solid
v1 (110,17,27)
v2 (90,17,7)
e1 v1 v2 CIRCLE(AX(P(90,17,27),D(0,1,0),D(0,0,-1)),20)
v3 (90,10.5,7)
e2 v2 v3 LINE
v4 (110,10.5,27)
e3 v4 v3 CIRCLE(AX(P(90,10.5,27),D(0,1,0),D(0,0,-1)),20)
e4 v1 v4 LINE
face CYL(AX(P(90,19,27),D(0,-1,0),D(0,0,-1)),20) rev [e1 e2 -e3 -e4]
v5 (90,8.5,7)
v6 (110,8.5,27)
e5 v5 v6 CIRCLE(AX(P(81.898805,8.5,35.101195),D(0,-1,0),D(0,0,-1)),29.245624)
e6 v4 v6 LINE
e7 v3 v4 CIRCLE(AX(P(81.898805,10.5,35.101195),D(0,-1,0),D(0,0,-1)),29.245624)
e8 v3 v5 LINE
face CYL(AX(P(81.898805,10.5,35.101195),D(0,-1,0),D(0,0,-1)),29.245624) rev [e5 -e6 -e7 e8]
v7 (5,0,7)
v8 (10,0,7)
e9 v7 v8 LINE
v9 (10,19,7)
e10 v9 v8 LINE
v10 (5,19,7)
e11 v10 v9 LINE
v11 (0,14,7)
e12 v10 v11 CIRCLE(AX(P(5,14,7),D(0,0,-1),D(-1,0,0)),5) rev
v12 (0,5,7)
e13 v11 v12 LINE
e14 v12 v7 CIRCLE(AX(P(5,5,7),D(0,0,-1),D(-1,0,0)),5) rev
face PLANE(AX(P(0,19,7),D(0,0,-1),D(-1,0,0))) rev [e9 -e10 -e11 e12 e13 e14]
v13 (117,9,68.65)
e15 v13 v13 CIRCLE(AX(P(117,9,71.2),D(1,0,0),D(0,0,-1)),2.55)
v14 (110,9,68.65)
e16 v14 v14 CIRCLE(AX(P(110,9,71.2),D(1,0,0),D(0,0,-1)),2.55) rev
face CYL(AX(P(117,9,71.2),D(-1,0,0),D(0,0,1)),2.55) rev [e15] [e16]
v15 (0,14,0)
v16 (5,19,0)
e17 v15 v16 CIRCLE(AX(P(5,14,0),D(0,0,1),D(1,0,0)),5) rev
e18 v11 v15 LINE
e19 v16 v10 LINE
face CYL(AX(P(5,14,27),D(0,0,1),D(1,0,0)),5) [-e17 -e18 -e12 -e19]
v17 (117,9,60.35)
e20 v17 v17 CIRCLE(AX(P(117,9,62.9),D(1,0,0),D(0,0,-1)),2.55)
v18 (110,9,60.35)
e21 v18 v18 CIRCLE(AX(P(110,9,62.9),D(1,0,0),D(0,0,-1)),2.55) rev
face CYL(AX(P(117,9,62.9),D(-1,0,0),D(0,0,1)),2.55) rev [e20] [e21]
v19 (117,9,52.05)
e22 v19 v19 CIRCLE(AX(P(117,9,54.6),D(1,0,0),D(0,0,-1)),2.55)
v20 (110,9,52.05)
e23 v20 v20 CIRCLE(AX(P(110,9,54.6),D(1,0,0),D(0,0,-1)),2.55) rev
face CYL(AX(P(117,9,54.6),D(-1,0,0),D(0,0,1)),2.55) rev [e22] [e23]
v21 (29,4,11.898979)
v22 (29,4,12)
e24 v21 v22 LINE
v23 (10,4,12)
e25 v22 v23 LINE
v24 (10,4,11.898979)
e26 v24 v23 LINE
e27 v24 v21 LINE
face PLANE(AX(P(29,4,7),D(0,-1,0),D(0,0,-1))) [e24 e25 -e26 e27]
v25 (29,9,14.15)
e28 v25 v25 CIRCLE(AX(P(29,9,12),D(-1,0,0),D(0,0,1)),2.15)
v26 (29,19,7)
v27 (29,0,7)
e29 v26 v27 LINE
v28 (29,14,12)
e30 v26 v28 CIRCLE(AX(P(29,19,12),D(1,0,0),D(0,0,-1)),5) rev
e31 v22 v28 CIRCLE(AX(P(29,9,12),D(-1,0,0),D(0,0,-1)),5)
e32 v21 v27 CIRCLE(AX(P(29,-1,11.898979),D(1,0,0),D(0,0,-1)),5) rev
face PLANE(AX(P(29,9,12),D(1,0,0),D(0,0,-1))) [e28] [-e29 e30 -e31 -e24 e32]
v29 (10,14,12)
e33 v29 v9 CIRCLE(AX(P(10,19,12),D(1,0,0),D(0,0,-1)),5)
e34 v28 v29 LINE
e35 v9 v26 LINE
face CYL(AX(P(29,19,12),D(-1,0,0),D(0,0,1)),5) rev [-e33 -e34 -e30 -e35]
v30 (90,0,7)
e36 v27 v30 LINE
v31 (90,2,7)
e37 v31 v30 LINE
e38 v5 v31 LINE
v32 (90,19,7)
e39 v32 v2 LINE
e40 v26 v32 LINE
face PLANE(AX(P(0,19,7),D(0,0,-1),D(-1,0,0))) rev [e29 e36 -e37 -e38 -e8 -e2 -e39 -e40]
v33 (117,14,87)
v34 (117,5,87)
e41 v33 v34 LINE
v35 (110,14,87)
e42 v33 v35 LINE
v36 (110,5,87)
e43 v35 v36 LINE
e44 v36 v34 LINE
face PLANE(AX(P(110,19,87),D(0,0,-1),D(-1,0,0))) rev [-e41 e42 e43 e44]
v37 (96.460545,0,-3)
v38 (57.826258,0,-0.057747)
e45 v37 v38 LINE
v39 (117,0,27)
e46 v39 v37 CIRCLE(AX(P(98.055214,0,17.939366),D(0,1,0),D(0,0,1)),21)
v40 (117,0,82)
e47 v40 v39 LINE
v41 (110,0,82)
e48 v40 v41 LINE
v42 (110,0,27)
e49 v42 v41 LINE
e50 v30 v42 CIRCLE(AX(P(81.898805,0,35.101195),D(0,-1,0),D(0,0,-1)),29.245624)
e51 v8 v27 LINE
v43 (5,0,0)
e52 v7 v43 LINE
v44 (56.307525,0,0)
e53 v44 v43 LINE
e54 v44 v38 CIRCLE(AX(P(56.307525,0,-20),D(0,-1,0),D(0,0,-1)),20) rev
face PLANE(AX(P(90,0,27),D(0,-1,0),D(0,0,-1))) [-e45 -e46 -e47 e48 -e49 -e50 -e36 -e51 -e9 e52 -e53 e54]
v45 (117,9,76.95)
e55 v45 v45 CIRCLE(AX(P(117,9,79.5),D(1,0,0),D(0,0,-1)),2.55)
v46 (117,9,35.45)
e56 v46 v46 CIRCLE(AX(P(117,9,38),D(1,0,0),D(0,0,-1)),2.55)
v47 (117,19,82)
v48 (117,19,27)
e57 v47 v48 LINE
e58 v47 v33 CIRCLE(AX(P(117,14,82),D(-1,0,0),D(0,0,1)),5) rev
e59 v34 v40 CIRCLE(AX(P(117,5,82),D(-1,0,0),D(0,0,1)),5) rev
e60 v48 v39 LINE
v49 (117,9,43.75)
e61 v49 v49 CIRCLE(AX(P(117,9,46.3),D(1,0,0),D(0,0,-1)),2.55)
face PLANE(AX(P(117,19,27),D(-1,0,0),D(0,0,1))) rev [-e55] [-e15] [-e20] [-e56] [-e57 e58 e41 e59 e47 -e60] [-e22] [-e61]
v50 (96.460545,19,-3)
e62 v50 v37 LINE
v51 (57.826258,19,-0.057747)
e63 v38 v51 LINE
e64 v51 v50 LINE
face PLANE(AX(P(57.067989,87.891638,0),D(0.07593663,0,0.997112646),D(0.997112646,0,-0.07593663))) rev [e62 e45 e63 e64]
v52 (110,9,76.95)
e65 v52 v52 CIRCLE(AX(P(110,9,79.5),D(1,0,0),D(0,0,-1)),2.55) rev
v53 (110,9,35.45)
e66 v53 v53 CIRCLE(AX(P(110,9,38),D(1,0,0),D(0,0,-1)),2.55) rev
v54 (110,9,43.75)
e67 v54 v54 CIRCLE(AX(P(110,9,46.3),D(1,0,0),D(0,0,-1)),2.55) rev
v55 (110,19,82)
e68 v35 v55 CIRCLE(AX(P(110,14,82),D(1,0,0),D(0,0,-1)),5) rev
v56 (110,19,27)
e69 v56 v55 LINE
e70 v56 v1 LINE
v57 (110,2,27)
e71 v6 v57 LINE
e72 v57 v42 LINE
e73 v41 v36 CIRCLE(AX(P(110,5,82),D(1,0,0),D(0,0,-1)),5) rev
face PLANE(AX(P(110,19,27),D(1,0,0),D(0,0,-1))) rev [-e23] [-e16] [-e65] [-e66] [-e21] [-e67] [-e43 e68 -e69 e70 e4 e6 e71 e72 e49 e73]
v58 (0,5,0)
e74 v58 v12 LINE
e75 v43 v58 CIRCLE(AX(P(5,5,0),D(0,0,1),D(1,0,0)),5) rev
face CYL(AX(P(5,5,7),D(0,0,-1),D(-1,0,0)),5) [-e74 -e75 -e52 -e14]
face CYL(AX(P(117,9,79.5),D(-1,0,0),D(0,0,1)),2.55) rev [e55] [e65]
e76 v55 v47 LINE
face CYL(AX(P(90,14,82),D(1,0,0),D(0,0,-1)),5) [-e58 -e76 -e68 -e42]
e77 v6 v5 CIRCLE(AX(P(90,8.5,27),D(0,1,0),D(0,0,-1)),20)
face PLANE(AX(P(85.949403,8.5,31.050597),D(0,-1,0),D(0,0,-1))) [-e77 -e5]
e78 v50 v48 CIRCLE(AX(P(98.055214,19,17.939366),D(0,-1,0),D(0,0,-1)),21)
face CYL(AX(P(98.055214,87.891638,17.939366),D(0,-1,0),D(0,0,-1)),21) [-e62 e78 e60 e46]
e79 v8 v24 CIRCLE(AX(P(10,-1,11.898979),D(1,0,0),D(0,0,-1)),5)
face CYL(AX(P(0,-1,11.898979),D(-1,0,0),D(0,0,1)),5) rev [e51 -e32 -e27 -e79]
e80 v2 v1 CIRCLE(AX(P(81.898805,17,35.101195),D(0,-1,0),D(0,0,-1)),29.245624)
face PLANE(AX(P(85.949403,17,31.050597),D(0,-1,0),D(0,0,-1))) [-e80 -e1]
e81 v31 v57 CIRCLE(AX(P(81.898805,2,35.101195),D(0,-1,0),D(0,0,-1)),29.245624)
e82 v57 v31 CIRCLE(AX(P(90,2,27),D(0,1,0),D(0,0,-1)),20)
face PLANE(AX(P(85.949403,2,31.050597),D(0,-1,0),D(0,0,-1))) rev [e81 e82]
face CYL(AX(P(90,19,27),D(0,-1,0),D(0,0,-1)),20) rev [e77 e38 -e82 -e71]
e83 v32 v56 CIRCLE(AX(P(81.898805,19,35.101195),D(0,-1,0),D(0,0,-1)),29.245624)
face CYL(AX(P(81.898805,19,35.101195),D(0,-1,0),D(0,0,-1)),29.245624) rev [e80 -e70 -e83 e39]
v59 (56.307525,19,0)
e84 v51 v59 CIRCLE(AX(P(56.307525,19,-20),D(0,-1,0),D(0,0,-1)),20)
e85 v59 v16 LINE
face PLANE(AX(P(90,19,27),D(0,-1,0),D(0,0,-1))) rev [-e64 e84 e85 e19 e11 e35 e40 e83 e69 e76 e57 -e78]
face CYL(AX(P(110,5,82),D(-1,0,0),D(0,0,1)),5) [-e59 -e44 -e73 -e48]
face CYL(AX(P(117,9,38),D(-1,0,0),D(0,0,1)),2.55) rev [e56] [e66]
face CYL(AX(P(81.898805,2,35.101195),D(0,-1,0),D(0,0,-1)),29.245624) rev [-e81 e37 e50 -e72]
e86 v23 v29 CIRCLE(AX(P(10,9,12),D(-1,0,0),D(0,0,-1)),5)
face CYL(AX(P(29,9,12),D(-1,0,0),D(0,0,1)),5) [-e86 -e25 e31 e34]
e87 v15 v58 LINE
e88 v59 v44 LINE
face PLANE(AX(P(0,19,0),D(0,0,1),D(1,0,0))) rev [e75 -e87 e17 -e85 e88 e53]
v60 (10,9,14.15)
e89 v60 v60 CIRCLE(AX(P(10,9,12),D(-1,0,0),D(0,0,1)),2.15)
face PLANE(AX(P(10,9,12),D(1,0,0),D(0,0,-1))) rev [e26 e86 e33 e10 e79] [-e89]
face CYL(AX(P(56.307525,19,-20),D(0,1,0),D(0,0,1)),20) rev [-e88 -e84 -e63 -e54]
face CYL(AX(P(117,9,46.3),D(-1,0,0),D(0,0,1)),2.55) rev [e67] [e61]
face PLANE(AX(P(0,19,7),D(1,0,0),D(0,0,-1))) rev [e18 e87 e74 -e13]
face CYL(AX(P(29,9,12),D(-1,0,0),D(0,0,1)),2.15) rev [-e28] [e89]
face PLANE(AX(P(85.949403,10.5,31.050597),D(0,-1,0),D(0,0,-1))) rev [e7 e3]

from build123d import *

# Parameters (mm, degrees)
BOSS_EXTRUDE1_DEPTH = 19
SKETCH4_R           = 2.55
CUT_EXTRUDE1_DEPTH  = 148.034009671
LPATTERN1_COUNT     = 6
LPATTERN1_PITCH     = 8.3
FILLET2_R           = 5
BOSS_EXTRUDE4_DEPTH = 19
BOSS_EXTRUDE5_DEPTH = 2
LPATTERN3_COUNT     = 3
LPATTERN3_PITCH     = 8.5
FILLET4_R           = 20
SKETCH9_R           = 2.15
BOSS_EXTRUDE6_DEPTH = 19
FILLET5_R           = 5


with BuildPart() as part:
    # Sketch1 → Boss-Extrude1 (new body)
    with BuildSketch(Plane(origin=(0, 0, 0), x_dir=(1, 0, 0), z_dir=(0, 1, 0))):
        with BuildLine():
            Line((0, 0), (90, 0))
            ThreePointArc((90, 0), (109.091883092, -7.908116908), (117, -27))
            Line((117, -27), (117, -87))
            Line((117, -87), (110, -87))
            Line((110, -87), (110, -27))
            ThreePointArc((110, -27), (104.142135624, -12.857864376), (90, -7))
            Line((90, -7), (0, -7))
            Line((0, -7), (0, 0))
        make_face()
    extrude(amount=BOSS_EXTRUDE1_DEPTH)

    # Sketch4 → Cut-Extrude1 (cut, through all)
    with BuildSketch(Plane(origin=(0, 0, 0), x_dir=(0, 0, -1), z_dir=(1, 0, 0))):
        with Locations((-79.5, 9)):
            Circle(SKETCH4_R)
    cut_extrude1 = extrude(amount=CUT_EXTRUDE1_DEPTH, mode=Mode.SUBTRACT)

    # LPattern1: Cut-Extrude1 ×6
    with Locations(*[(0, 0, -i * LPATTERN1_PITCH) for i in range(1, LPATTERN1_COUNT)]):
        add(cut_extrude1, mode=Mode.SUBTRACT)

    # Fillet2
    fillet2_edges = [part.edges().sort_by_distance(p)[0] for p in [
        (0, 0, 3.5),
        (113.5, 19, 87),
        (0, 19, 3.5),
        (113.5, 0, 87),
    ]]
    fillet(fillet2_edges, radius=FILLET2_R)

    # Sketch6 → Boss-Extrude4 (add)
    with BuildSketch(Plane(origin=(0, 0, 0), x_dir=(1, 0, 0), z_dir=(0, 1, 0))):
        with BuildLine():
            Line((57.067989457, 0), (96.460545107, 3))
            ThreePointArc((96.460545107, 3), (115.383129249, -6.075834674), (117, -27))
            ThreePointArc((117, -27), (109.091883092, -7.908116908), (90, 0))
            Line((90, 0), (57.067989457, 0))
        make_face()
    extrude(amount=BOSS_EXTRUDE4_DEPTH)

    # Sketch8 → Boss-Extrude5 (add)
    with BuildSketch(Plane(origin=(0, 0, 0), x_dir=(1, 0, 0), z_dir=(0, 1, 0))):
        with BuildLine():
            ThreePointArc((90, -7), (102.578584062, -14.421415938), (110, -27))
            ThreePointArc((110, -27), (104.142135624, -12.857864376), (90, -7))
        make_face()
    boss_extrude5 = extrude(amount=BOSS_EXTRUDE5_DEPTH)

    # LPattern3: Boss-Extrude5 ×3
    with Locations(*[(0, i * LPATTERN3_PITCH, 0) for i in range(1, LPATTERN3_COUNT)]):
        add(boss_extrude5)

    # Fillet4
    # the kernel refuses this fillet: 20 mm, written as the material it adds along each edge
    with BuildSketch(Plane(origin=(57.067989457, 0, 0), x_dir=(-1, 0, 0), z_dir=(0, 1, 0))) as fillet4_piece_1:
        with BuildLine():
            CenterArc((FILLET4_R * 0.0380232084134, -FILLET4_R), FILLET4_R, 90, 4.355040752)
            Line((-FILLET4_R * 0.0379134219382, -FILLET4_R * 0.00288735432207), (0, 0))
            Line((0, 0), (FILLET4_R * 0.0380232084134, 0))
        make_face()
    extrude(amount=19)

    # Sketch9 → Boss-Extrude6 (add)
    with BuildSketch(Plane.ZY.offset(-10)):
        with BuildLine():
            Line((7, 14), (12, 14))
            ThreePointArc((12, 14), (17, 9), (12, 4))
            Line((12, 4), (7, 4))
            Line((7, 4), (7, 14))
        make_face()
        with Locations((12, 9)):
            Circle(SKETCH9_R, mode=Mode.SUBTRACT)
    extrude(amount=-BOSS_EXTRUDE6_DEPTH)

    # Fillet5
    # the kernel refuses this fillet: 5 mm, written as the material it adds along each edge
    with BuildSketch(Plane(origin=(10, 4, 7), x_dir=(0, -1.0, 1.5831780331149625e-12), z_dir=(1, 0, 0))) as fillet5_piece_1:
        with BuildLine():
            CenterArc((5, -4.898979486), FILLET5_R, 101.536959033, 78.463040967)
            Line((0, -4.898979486), (0, 0))
            Line((0, 0), (4, 0))
        make_face()
    extrude(amount=19)
    with BuildSketch(Plane(origin=(10, 14, 7), x_dir=(0, 1, 0), z_dir=(1, 0, 0))) as fillet5_piece_2:
        with BuildLine():
            CenterArc((FILLET5_R, FILLET5_R), FILLET5_R, 180, 90)
            Line((0, FILLET5_R), (0, 0))
            Line((0, 0), (FILLET5_R, 0))
        make_face()
    extrude(amount=19)


solid = part.part
